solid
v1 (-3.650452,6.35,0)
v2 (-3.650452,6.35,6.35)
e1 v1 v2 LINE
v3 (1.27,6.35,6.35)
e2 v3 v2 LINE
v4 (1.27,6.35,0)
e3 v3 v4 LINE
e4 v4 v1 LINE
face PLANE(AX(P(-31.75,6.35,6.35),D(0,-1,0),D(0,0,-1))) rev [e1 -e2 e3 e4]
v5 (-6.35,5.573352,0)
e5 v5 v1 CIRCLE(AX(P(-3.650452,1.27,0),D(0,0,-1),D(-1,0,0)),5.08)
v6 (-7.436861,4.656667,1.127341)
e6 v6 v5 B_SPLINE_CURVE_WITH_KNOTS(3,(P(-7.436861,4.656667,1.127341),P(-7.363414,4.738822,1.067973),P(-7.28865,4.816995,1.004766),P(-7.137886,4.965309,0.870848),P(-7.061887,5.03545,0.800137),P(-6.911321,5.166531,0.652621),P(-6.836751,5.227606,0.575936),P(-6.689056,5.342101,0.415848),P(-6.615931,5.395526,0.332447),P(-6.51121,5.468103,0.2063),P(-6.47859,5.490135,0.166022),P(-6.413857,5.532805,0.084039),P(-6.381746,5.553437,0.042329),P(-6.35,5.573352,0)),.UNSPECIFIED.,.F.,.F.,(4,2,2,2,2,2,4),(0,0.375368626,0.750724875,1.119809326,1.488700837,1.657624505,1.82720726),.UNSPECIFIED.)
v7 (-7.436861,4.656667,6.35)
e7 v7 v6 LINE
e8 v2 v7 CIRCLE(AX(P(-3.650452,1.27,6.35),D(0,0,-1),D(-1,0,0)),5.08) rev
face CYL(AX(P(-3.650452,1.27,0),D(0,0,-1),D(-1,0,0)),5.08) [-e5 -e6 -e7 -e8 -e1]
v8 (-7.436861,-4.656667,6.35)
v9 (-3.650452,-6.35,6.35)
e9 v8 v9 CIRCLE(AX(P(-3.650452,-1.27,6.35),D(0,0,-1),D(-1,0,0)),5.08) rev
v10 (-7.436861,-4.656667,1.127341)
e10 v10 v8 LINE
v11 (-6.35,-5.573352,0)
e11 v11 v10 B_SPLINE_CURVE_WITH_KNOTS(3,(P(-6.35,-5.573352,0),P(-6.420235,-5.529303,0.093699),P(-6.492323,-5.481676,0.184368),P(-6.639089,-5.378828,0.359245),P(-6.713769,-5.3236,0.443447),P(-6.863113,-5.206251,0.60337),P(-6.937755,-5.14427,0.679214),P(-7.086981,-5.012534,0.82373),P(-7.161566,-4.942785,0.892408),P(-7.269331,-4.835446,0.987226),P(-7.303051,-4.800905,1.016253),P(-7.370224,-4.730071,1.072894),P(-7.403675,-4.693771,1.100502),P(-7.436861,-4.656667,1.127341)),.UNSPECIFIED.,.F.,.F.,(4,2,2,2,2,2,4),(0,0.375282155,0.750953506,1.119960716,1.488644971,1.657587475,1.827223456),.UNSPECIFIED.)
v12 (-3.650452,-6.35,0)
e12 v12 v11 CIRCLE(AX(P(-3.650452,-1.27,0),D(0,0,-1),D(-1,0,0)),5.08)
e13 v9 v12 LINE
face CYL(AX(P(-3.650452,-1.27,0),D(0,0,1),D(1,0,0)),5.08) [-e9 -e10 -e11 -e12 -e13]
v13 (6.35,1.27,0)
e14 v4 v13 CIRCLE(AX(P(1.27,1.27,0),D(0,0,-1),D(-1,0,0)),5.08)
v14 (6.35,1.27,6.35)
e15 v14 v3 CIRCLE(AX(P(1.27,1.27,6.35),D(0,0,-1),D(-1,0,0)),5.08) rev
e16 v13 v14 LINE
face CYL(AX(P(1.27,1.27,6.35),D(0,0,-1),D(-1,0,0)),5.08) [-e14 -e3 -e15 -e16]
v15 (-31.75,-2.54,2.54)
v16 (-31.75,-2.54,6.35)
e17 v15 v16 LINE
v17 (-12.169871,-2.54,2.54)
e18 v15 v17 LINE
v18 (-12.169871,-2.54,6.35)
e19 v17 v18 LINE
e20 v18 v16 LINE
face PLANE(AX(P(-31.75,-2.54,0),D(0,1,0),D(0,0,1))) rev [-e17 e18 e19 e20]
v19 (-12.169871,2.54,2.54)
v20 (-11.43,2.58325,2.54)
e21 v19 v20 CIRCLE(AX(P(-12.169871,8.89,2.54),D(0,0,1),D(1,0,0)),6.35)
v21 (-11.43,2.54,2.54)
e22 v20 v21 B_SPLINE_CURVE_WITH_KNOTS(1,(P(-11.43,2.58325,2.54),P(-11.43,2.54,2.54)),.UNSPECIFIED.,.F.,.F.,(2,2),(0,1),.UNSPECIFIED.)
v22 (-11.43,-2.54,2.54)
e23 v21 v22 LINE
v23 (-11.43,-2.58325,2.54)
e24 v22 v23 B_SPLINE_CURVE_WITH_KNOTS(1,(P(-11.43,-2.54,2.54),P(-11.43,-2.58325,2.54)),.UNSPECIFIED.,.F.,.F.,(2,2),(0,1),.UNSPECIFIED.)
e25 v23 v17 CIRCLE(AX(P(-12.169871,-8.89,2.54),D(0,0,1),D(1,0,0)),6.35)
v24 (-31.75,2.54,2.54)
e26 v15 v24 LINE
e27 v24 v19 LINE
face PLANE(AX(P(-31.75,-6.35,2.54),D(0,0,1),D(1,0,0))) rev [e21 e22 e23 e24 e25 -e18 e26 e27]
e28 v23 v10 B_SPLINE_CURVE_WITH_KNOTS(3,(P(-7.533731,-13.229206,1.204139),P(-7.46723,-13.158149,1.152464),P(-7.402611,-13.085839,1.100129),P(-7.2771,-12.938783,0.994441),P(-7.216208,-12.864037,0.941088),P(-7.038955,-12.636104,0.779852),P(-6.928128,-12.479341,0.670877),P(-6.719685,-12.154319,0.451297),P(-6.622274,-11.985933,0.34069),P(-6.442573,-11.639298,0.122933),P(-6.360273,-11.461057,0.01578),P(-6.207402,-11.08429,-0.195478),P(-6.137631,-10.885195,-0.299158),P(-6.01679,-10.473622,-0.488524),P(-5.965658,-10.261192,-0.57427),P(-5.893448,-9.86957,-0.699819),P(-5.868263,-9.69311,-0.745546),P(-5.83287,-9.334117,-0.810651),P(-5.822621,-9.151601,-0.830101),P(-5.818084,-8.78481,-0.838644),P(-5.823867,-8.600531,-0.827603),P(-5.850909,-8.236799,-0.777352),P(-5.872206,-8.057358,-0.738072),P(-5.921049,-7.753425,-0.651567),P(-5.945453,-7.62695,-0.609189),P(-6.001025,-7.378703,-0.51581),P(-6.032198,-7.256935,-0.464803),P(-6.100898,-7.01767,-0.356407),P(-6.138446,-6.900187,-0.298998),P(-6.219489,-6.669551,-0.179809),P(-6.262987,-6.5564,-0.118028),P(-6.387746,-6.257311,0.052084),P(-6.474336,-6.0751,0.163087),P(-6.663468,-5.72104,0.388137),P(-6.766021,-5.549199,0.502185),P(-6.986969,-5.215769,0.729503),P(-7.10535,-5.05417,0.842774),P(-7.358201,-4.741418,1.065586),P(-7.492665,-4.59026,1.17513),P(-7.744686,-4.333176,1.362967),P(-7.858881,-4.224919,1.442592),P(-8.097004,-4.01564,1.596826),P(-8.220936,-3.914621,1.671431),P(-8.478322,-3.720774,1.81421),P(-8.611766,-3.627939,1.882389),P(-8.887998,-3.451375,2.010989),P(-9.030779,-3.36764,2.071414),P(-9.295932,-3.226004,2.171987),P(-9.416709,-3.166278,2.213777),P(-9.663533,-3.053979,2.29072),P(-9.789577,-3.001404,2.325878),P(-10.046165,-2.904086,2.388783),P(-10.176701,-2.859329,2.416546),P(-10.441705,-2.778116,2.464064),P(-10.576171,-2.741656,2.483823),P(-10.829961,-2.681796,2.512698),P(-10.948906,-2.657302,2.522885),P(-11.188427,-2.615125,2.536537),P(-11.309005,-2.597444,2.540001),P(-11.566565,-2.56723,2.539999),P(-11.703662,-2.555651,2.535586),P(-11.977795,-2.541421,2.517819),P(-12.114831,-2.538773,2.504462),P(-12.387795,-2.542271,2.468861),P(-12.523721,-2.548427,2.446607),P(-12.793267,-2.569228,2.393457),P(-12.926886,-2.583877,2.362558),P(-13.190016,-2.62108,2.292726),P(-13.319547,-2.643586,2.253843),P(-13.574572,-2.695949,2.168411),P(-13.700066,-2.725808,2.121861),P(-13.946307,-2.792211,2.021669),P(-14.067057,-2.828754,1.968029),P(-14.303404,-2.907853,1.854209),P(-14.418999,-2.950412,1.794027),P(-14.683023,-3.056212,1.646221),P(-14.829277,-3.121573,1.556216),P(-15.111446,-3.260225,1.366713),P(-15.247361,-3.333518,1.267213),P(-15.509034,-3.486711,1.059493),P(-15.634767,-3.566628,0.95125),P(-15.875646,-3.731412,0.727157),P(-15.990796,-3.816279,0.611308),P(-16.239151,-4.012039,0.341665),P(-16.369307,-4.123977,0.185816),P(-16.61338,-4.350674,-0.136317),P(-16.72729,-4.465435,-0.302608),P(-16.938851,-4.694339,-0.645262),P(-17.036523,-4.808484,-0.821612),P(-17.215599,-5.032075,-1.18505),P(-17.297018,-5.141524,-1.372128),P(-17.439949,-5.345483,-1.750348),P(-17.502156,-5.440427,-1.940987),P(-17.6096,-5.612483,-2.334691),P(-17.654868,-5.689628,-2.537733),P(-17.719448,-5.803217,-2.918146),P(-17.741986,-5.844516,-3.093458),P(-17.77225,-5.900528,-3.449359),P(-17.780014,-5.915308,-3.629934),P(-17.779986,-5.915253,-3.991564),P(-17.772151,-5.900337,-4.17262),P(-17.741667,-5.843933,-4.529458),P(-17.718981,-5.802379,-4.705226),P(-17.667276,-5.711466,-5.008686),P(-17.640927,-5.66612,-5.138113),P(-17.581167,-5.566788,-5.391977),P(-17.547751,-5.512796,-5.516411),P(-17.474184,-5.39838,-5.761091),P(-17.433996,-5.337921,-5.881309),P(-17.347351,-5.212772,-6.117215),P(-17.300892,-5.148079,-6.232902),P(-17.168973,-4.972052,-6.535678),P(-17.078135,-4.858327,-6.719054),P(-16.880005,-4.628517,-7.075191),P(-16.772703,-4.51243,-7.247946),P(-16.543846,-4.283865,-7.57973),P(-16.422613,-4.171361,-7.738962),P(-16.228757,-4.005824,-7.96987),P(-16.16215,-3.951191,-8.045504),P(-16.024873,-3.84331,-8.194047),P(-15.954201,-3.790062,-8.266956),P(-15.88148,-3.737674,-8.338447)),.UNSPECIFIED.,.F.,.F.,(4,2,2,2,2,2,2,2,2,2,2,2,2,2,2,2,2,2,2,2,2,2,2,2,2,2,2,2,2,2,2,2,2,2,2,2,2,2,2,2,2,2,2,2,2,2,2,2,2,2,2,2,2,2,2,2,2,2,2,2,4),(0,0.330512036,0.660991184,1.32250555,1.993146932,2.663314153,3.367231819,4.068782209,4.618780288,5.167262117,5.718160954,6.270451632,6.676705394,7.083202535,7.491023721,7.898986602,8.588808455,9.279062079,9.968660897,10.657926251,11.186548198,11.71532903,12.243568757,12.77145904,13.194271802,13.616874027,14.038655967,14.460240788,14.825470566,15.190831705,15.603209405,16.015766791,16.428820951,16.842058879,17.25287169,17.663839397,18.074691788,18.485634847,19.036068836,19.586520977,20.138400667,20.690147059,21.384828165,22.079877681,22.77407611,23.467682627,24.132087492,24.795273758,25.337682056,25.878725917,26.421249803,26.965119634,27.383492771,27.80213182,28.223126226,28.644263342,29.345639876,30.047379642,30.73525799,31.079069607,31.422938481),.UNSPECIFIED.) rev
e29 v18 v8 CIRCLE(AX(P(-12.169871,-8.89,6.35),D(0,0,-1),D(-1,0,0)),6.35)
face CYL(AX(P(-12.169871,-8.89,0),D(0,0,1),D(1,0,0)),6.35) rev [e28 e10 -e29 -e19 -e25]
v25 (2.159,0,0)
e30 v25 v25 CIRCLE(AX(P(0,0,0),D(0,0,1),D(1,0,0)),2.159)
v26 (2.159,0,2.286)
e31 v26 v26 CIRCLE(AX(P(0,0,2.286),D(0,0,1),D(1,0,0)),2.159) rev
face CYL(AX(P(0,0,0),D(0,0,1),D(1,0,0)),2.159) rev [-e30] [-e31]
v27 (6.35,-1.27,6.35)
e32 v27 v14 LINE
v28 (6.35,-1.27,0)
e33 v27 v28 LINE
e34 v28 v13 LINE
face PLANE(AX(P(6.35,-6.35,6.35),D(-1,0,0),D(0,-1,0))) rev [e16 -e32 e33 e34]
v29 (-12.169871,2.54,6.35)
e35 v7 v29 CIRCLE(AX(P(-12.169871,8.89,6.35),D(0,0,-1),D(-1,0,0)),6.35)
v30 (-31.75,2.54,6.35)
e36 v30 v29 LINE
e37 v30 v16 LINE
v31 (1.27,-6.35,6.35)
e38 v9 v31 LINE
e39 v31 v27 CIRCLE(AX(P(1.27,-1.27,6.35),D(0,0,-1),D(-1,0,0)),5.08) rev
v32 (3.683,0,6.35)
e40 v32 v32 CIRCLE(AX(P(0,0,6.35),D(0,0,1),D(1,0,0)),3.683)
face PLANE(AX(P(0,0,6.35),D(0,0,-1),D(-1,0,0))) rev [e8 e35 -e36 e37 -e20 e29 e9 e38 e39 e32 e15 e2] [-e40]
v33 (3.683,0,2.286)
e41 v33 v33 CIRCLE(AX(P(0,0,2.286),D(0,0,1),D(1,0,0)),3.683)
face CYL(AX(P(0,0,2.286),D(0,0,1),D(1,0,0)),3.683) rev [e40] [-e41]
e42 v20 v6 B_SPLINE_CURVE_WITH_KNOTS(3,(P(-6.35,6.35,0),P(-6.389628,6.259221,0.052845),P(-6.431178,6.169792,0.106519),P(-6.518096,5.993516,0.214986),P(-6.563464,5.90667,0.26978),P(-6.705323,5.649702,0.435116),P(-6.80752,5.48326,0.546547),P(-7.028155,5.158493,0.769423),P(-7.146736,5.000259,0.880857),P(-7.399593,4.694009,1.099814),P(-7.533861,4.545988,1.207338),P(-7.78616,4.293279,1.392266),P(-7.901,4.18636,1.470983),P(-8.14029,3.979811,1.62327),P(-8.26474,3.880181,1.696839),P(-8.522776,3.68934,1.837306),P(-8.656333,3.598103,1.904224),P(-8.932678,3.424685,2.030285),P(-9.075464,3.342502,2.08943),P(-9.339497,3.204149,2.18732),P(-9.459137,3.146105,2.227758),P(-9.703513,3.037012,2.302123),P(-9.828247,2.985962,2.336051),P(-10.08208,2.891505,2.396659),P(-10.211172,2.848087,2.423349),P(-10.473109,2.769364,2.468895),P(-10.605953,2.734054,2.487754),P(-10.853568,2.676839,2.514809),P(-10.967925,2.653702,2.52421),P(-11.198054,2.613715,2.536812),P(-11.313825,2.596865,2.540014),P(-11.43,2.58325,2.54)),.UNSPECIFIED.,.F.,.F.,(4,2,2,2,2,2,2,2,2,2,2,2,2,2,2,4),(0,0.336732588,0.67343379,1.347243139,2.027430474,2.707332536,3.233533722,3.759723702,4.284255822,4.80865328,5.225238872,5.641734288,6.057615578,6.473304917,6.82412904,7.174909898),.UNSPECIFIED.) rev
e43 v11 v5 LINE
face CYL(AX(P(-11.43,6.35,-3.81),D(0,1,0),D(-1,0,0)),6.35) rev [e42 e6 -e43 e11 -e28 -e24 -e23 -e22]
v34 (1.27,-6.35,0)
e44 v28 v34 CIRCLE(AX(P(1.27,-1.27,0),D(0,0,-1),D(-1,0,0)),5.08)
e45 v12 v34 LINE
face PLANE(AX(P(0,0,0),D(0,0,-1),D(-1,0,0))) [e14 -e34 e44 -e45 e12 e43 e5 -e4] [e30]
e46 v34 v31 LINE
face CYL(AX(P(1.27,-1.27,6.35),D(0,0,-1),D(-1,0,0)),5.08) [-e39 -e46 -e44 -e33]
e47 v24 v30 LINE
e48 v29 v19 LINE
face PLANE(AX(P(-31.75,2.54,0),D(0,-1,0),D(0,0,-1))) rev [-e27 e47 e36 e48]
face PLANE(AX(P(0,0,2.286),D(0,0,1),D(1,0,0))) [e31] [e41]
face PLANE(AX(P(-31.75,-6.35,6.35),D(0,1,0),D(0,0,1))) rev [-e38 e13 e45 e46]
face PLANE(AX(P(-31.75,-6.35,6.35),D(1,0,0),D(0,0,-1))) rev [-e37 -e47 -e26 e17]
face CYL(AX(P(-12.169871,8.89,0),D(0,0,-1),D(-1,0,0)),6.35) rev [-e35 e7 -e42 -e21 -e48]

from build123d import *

# Parameters (mm, degrees)
SKETCH1_W           = 38.1
SKETCH1_H           = 12.7
BOSS_EXTRUDE1_DEPTH = 6.35
SKETCH2_R           = 2.159
CUT_EXTRUDE1_DEPTH  = 33.995567884
SKETCH3_R           = 3.683
CUT_EXTRUDE2_DEPTH  = 4.064
SKETCH5_W           = 25.4
SKETCH5_H           = 3.81
CUT_EXTRUDE3_DEPTH  = 33.995567884
SKETCH6_W           = 25.4
SKETCH6_H           = 2.54
CUT_EXTRUDE4_DEPTH  = 34.577032329
FILLET3_R           = 6.35
FILLET4_R           = 5.08


with BuildPart() as part:
    # Sketch1 → Boss-Extrude1 (new body)
    with BuildSketch(Plane.XY):
        with Locations((-12.7, 0)):
            Rectangle(SKETCH1_W, SKETCH1_H)
    extrude(amount=BOSS_EXTRUDE1_DEPTH)

    # Sketch2 → Cut-Extrude1 (cut, through all)
    with BuildSketch(Plane.XY.offset(6.35)):
        Circle(SKETCH2_R)
    extrude(amount=-CUT_EXTRUDE1_DEPTH, mode=Mode.SUBTRACT)

    # Sketch3 → Cut-Extrude2 (cut)
    with BuildSketch(Plane.XY.offset(6.35)):
        Circle(SKETCH3_R)
    extrude(amount=-CUT_EXTRUDE2_DEPTH, mode=Mode.SUBTRACT)

    # Sketch5 → Cut-Extrude3 (cut, through all)
    with BuildSketch(Plane.XY.offset(6.35)):
        with Locations((-19.05, 4.445)):
            Rectangle(SKETCH5_W, SKETCH5_H)
        with Locations((-19.05, -4.445)):
            Rectangle(SKETCH5_W, SKETCH5_H)
    extrude(amount=-CUT_EXTRUDE3_DEPTH, mode=Mode.SUBTRACT)

    # Sketch6 → Cut-Extrude4 (cut, through all)
    with BuildSketch(Plane(origin=(0, 2.54, 0), x_dir=(1, 0, 0), z_dir=(0, 1, 0))):
        with Locations((-19.05, -1.27)):
            Rectangle(SKETCH6_W, SKETCH6_H)
    extrude(amount=-CUT_EXTRUDE4_DEPTH, mode=Mode.SUBTRACT)

    # Fillet3
    # the kernel refuses this fillet: 6.35 mm, written as the material it adds along each edge
    with BuildSketch(Plane(origin=(-6.35, -2.54, 6.35), x_dir=(-1, 0, 0), z_dir=(0, 0, -1))) as fillet3_piece_1:
        with BuildLine():
            CenterArc((5.819871133, -6.35), FILLET3_R, 90, 66.421821522)
            Line((0, -3.81), (-0.116397423, -3.7592))
            ThreePointArc((-0.116397423, -3.7592), (-0.127, -1.905), (-0.127, 0))
            Line((-0.127, 0), (0, 0.127))
            Line((0, 0.127), (5.819871133, 0.127))
            Line((5.819871133, 0.127), (5.819871133, 0))
        make_face()
    extrude(amount=3.81)
    with BuildSketch(Plane(origin=(-6.35, 2.54, 2.54), x_dir=(-1, 0, 0), z_dir=(0, -1, 0))) as fillet3_piece_2:
        with BuildLine():
            CenterArc((5.08, 6.35), FILLET3_R, 216.869897646, 53.130102354)
            Line((0, 2.54), (-0.1016, 2.4638))
            ThreePointArc((-0.1016, 2.4638), (-0.127, 1.27), (-0.127, 0))
            Line((-0.127, 0), (0, -0.127))
            Line((0, -0.127), (5.08, -0.127))
            Line((5.08, -0.127), (5.08, 0))
        make_face()
    extrude(amount=5.08)
    with BuildSketch(Plane(origin=(-6.35, 2.54, 6.35), x_dir=(-1, 0, 0), z_dir=(0, 0, -1))) as fillet3_piece_3:
        with BuildLine():
            CenterArc((5.819871133, 6.35), FILLET3_R, 203.578178478, 66.421821522)
            Line((0, 3.81), (-0.116397423, 3.7592))
            ThreePointArc((-0.116397423, 3.7592), (-0.127, 1.905), (-0.127, 0))
            Line((-0.127, 0), (0, -0.127))
            Line((0, -0.127), (5.819871133, -0.127))
            Line((5.819871133, -0.127), (5.819871133, 0))
        make_face()
    extrude(amount=3.81)
    with BuildSketch(Plane(origin=(-6.35, 2.54, 2.54), x_dir=(-1, 0, 0), z_dir=(0, -1, 0))) as fillet3_piece_4a_section:
        with BuildLine():
            CenterArc((5.08, 6.35), FILLET3_R, 216.869897646, 53.130102354)
            Line((0, 2.54), (-0.1016, 2.4638))
            ThreePointArc((-0.1016, 2.4638), (-0.127, 1.27), (-0.127, 0))
            Line((-0.127, 0), (0, -0.127))
            Line((0, -0.127), (5.08, -0.127))
            Line((5.08, -0.127), (5.08, 0))
        make_face()
    fillet3_piece_4a = extrude(amount=17.78, mode=Mode.PRIVATE)
    fillet3_piece_4a = split(fillet3_piece_4a, bisect_by=Plane(origin=(-7.657359662, -6.35, 1.889832946), z_dir=(0, 1, 0)), keep=Keep.TOP, mode=Mode.PRIVATE)
    fillet3_piece_4a = split(fillet3_piece_4a, bisect_by=Plane(origin=(-7.657359662, -2.54, 1.889832946), z_dir=(0, -1, 0)), keep=Keep.TOP, mode=Mode.PRIVATE)
    with BuildSketch(Plane(origin=(-6.35, -2.54, 6.35), x_dir=(-1, 0, 0), z_dir=(0, 0, -1))) as fillet3_piece_4b_section:
        with BuildLine():
            CenterArc((5.819871133, -6.35), FILLET3_R, 90, 66.421821522)
            Line((0, -3.81), (-0.116397423, -3.7592))
            ThreePointArc((-0.116397423, -3.7592), (-0.127, -1.905), (-0.127, 0))
            Line((-0.127, 0), (0, 0.127))
            Line((0, 0.127), (5.819871133, 0.127))
            Line((5.819871133, 0.127), (5.819871133, 0))
        make_face()
    fillet3_piece_4b = extrude(amount=18.359677831, mode=Mode.PRIVATE)
    fillet3_piece_4b = split(fillet3_piece_4b, bisect_by=Plane(origin=(-7.767240906, -3.525286877, 2.54), z_dir=(0, 0, -1)), keep=Keep.TOP, mode=Mode.PRIVATE)
    fillet3_piece_4b = split(fillet3_piece_4b, bisect_by=Plane(origin=(-7.767240906, -3.525286877, 0), z_dir=(0, 0, 1)), keep=Keep.TOP, mode=Mode.PRIVATE)
    fillet3_piece_4 = fillet3_piece_4a & fillet3_piece_4b
    add(fillet3_piece_4)
    with BuildSketch(Plane(origin=(-6.35, 2.54, 6.35), x_dir=(-1, 0, 0), z_dir=(0, 0, -1))) as fillet3_piece_5a_section:
        with BuildLine():
            CenterArc((5.819871133, 6.35), FILLET3_R, 203.578178478, 66.421821522)
            Line((0, 3.81), (-0.116397423, 3.7592))
            ThreePointArc((-0.116397423, 3.7592), (-0.127, 1.905), (-0.127, 0))
            Line((-0.127, 0), (0, -0.127))
            Line((0, -0.127), (5.819871133, -0.127))
            Line((5.819871133, -0.127), (5.819871133, 0))
        make_face()
    fillet3_piece_5a = extrude(amount=18.359677831, mode=Mode.PRIVATE)
    fillet3_piece_5a = split(fillet3_piece_5a, bisect_by=Plane(origin=(-7.767240906, 3.525286877, 2.54), z_dir=(0, 0, -1)), keep=Keep.TOP, mode=Mode.PRIVATE)
    fillet3_piece_5a = split(fillet3_piece_5a, bisect_by=Plane(origin=(-7.767240906, 3.525286877, 0), z_dir=(0, 0, 1)), keep=Keep.TOP, mode=Mode.PRIVATE)
    with BuildSketch(Plane(origin=(-6.35, 15.24, 2.54), x_dir=(-1, 0, 0), z_dir=(0, -1, 0))) as fillet3_piece_5b_section:
        with BuildLine():
            CenterArc((5.08, 6.35), FILLET3_R, 216.869897646, 53.130102354)
            Line((0, 2.54), (-0.1016, 2.4638))
            ThreePointArc((-0.1016, 2.4638), (-0.127, 1.27), (-0.127, 0))
            Line((-0.127, 0), (0, -0.127))
            Line((0, -0.127), (5.08, -0.127))
            Line((5.08, -0.127), (5.08, 0))
        make_face()
    fillet3_piece_5b = extrude(amount=17.78, mode=Mode.PRIVATE)
    fillet3_piece_5b = split(fillet3_piece_5b, bisect_by=Plane(origin=(-7.657359662, 6.35, 1.889832946), z_dir=(0, -1, 0)), keep=Keep.TOP, mode=Mode.PRIVATE)
    fillet3_piece_5b = split(fillet3_piece_5b, bisect_by=Plane(origin=(-7.657359662, 2.54, 1.889832946), z_dir=(0, 1, 0)), keep=Keep.TOP, mode=Mode.PRIVATE)
    fillet3_piece_5 = fillet3_piece_5a & fillet3_piece_5b
    add(fillet3_piece_5)

    # Fillet4
    fillet4_edges = [part.edges().sort_by_distance(p)[0] for p in [
        (-6.35, 6.35, 3.175),
        (-6.35, -6.35, 3.175),
        (6.35, -6.35, 3.175),
        (6.35, 6.35, 3.175),
    ]]
    fillet(fillet4_edges, radius=FILLET4_R)


solid = part.part
